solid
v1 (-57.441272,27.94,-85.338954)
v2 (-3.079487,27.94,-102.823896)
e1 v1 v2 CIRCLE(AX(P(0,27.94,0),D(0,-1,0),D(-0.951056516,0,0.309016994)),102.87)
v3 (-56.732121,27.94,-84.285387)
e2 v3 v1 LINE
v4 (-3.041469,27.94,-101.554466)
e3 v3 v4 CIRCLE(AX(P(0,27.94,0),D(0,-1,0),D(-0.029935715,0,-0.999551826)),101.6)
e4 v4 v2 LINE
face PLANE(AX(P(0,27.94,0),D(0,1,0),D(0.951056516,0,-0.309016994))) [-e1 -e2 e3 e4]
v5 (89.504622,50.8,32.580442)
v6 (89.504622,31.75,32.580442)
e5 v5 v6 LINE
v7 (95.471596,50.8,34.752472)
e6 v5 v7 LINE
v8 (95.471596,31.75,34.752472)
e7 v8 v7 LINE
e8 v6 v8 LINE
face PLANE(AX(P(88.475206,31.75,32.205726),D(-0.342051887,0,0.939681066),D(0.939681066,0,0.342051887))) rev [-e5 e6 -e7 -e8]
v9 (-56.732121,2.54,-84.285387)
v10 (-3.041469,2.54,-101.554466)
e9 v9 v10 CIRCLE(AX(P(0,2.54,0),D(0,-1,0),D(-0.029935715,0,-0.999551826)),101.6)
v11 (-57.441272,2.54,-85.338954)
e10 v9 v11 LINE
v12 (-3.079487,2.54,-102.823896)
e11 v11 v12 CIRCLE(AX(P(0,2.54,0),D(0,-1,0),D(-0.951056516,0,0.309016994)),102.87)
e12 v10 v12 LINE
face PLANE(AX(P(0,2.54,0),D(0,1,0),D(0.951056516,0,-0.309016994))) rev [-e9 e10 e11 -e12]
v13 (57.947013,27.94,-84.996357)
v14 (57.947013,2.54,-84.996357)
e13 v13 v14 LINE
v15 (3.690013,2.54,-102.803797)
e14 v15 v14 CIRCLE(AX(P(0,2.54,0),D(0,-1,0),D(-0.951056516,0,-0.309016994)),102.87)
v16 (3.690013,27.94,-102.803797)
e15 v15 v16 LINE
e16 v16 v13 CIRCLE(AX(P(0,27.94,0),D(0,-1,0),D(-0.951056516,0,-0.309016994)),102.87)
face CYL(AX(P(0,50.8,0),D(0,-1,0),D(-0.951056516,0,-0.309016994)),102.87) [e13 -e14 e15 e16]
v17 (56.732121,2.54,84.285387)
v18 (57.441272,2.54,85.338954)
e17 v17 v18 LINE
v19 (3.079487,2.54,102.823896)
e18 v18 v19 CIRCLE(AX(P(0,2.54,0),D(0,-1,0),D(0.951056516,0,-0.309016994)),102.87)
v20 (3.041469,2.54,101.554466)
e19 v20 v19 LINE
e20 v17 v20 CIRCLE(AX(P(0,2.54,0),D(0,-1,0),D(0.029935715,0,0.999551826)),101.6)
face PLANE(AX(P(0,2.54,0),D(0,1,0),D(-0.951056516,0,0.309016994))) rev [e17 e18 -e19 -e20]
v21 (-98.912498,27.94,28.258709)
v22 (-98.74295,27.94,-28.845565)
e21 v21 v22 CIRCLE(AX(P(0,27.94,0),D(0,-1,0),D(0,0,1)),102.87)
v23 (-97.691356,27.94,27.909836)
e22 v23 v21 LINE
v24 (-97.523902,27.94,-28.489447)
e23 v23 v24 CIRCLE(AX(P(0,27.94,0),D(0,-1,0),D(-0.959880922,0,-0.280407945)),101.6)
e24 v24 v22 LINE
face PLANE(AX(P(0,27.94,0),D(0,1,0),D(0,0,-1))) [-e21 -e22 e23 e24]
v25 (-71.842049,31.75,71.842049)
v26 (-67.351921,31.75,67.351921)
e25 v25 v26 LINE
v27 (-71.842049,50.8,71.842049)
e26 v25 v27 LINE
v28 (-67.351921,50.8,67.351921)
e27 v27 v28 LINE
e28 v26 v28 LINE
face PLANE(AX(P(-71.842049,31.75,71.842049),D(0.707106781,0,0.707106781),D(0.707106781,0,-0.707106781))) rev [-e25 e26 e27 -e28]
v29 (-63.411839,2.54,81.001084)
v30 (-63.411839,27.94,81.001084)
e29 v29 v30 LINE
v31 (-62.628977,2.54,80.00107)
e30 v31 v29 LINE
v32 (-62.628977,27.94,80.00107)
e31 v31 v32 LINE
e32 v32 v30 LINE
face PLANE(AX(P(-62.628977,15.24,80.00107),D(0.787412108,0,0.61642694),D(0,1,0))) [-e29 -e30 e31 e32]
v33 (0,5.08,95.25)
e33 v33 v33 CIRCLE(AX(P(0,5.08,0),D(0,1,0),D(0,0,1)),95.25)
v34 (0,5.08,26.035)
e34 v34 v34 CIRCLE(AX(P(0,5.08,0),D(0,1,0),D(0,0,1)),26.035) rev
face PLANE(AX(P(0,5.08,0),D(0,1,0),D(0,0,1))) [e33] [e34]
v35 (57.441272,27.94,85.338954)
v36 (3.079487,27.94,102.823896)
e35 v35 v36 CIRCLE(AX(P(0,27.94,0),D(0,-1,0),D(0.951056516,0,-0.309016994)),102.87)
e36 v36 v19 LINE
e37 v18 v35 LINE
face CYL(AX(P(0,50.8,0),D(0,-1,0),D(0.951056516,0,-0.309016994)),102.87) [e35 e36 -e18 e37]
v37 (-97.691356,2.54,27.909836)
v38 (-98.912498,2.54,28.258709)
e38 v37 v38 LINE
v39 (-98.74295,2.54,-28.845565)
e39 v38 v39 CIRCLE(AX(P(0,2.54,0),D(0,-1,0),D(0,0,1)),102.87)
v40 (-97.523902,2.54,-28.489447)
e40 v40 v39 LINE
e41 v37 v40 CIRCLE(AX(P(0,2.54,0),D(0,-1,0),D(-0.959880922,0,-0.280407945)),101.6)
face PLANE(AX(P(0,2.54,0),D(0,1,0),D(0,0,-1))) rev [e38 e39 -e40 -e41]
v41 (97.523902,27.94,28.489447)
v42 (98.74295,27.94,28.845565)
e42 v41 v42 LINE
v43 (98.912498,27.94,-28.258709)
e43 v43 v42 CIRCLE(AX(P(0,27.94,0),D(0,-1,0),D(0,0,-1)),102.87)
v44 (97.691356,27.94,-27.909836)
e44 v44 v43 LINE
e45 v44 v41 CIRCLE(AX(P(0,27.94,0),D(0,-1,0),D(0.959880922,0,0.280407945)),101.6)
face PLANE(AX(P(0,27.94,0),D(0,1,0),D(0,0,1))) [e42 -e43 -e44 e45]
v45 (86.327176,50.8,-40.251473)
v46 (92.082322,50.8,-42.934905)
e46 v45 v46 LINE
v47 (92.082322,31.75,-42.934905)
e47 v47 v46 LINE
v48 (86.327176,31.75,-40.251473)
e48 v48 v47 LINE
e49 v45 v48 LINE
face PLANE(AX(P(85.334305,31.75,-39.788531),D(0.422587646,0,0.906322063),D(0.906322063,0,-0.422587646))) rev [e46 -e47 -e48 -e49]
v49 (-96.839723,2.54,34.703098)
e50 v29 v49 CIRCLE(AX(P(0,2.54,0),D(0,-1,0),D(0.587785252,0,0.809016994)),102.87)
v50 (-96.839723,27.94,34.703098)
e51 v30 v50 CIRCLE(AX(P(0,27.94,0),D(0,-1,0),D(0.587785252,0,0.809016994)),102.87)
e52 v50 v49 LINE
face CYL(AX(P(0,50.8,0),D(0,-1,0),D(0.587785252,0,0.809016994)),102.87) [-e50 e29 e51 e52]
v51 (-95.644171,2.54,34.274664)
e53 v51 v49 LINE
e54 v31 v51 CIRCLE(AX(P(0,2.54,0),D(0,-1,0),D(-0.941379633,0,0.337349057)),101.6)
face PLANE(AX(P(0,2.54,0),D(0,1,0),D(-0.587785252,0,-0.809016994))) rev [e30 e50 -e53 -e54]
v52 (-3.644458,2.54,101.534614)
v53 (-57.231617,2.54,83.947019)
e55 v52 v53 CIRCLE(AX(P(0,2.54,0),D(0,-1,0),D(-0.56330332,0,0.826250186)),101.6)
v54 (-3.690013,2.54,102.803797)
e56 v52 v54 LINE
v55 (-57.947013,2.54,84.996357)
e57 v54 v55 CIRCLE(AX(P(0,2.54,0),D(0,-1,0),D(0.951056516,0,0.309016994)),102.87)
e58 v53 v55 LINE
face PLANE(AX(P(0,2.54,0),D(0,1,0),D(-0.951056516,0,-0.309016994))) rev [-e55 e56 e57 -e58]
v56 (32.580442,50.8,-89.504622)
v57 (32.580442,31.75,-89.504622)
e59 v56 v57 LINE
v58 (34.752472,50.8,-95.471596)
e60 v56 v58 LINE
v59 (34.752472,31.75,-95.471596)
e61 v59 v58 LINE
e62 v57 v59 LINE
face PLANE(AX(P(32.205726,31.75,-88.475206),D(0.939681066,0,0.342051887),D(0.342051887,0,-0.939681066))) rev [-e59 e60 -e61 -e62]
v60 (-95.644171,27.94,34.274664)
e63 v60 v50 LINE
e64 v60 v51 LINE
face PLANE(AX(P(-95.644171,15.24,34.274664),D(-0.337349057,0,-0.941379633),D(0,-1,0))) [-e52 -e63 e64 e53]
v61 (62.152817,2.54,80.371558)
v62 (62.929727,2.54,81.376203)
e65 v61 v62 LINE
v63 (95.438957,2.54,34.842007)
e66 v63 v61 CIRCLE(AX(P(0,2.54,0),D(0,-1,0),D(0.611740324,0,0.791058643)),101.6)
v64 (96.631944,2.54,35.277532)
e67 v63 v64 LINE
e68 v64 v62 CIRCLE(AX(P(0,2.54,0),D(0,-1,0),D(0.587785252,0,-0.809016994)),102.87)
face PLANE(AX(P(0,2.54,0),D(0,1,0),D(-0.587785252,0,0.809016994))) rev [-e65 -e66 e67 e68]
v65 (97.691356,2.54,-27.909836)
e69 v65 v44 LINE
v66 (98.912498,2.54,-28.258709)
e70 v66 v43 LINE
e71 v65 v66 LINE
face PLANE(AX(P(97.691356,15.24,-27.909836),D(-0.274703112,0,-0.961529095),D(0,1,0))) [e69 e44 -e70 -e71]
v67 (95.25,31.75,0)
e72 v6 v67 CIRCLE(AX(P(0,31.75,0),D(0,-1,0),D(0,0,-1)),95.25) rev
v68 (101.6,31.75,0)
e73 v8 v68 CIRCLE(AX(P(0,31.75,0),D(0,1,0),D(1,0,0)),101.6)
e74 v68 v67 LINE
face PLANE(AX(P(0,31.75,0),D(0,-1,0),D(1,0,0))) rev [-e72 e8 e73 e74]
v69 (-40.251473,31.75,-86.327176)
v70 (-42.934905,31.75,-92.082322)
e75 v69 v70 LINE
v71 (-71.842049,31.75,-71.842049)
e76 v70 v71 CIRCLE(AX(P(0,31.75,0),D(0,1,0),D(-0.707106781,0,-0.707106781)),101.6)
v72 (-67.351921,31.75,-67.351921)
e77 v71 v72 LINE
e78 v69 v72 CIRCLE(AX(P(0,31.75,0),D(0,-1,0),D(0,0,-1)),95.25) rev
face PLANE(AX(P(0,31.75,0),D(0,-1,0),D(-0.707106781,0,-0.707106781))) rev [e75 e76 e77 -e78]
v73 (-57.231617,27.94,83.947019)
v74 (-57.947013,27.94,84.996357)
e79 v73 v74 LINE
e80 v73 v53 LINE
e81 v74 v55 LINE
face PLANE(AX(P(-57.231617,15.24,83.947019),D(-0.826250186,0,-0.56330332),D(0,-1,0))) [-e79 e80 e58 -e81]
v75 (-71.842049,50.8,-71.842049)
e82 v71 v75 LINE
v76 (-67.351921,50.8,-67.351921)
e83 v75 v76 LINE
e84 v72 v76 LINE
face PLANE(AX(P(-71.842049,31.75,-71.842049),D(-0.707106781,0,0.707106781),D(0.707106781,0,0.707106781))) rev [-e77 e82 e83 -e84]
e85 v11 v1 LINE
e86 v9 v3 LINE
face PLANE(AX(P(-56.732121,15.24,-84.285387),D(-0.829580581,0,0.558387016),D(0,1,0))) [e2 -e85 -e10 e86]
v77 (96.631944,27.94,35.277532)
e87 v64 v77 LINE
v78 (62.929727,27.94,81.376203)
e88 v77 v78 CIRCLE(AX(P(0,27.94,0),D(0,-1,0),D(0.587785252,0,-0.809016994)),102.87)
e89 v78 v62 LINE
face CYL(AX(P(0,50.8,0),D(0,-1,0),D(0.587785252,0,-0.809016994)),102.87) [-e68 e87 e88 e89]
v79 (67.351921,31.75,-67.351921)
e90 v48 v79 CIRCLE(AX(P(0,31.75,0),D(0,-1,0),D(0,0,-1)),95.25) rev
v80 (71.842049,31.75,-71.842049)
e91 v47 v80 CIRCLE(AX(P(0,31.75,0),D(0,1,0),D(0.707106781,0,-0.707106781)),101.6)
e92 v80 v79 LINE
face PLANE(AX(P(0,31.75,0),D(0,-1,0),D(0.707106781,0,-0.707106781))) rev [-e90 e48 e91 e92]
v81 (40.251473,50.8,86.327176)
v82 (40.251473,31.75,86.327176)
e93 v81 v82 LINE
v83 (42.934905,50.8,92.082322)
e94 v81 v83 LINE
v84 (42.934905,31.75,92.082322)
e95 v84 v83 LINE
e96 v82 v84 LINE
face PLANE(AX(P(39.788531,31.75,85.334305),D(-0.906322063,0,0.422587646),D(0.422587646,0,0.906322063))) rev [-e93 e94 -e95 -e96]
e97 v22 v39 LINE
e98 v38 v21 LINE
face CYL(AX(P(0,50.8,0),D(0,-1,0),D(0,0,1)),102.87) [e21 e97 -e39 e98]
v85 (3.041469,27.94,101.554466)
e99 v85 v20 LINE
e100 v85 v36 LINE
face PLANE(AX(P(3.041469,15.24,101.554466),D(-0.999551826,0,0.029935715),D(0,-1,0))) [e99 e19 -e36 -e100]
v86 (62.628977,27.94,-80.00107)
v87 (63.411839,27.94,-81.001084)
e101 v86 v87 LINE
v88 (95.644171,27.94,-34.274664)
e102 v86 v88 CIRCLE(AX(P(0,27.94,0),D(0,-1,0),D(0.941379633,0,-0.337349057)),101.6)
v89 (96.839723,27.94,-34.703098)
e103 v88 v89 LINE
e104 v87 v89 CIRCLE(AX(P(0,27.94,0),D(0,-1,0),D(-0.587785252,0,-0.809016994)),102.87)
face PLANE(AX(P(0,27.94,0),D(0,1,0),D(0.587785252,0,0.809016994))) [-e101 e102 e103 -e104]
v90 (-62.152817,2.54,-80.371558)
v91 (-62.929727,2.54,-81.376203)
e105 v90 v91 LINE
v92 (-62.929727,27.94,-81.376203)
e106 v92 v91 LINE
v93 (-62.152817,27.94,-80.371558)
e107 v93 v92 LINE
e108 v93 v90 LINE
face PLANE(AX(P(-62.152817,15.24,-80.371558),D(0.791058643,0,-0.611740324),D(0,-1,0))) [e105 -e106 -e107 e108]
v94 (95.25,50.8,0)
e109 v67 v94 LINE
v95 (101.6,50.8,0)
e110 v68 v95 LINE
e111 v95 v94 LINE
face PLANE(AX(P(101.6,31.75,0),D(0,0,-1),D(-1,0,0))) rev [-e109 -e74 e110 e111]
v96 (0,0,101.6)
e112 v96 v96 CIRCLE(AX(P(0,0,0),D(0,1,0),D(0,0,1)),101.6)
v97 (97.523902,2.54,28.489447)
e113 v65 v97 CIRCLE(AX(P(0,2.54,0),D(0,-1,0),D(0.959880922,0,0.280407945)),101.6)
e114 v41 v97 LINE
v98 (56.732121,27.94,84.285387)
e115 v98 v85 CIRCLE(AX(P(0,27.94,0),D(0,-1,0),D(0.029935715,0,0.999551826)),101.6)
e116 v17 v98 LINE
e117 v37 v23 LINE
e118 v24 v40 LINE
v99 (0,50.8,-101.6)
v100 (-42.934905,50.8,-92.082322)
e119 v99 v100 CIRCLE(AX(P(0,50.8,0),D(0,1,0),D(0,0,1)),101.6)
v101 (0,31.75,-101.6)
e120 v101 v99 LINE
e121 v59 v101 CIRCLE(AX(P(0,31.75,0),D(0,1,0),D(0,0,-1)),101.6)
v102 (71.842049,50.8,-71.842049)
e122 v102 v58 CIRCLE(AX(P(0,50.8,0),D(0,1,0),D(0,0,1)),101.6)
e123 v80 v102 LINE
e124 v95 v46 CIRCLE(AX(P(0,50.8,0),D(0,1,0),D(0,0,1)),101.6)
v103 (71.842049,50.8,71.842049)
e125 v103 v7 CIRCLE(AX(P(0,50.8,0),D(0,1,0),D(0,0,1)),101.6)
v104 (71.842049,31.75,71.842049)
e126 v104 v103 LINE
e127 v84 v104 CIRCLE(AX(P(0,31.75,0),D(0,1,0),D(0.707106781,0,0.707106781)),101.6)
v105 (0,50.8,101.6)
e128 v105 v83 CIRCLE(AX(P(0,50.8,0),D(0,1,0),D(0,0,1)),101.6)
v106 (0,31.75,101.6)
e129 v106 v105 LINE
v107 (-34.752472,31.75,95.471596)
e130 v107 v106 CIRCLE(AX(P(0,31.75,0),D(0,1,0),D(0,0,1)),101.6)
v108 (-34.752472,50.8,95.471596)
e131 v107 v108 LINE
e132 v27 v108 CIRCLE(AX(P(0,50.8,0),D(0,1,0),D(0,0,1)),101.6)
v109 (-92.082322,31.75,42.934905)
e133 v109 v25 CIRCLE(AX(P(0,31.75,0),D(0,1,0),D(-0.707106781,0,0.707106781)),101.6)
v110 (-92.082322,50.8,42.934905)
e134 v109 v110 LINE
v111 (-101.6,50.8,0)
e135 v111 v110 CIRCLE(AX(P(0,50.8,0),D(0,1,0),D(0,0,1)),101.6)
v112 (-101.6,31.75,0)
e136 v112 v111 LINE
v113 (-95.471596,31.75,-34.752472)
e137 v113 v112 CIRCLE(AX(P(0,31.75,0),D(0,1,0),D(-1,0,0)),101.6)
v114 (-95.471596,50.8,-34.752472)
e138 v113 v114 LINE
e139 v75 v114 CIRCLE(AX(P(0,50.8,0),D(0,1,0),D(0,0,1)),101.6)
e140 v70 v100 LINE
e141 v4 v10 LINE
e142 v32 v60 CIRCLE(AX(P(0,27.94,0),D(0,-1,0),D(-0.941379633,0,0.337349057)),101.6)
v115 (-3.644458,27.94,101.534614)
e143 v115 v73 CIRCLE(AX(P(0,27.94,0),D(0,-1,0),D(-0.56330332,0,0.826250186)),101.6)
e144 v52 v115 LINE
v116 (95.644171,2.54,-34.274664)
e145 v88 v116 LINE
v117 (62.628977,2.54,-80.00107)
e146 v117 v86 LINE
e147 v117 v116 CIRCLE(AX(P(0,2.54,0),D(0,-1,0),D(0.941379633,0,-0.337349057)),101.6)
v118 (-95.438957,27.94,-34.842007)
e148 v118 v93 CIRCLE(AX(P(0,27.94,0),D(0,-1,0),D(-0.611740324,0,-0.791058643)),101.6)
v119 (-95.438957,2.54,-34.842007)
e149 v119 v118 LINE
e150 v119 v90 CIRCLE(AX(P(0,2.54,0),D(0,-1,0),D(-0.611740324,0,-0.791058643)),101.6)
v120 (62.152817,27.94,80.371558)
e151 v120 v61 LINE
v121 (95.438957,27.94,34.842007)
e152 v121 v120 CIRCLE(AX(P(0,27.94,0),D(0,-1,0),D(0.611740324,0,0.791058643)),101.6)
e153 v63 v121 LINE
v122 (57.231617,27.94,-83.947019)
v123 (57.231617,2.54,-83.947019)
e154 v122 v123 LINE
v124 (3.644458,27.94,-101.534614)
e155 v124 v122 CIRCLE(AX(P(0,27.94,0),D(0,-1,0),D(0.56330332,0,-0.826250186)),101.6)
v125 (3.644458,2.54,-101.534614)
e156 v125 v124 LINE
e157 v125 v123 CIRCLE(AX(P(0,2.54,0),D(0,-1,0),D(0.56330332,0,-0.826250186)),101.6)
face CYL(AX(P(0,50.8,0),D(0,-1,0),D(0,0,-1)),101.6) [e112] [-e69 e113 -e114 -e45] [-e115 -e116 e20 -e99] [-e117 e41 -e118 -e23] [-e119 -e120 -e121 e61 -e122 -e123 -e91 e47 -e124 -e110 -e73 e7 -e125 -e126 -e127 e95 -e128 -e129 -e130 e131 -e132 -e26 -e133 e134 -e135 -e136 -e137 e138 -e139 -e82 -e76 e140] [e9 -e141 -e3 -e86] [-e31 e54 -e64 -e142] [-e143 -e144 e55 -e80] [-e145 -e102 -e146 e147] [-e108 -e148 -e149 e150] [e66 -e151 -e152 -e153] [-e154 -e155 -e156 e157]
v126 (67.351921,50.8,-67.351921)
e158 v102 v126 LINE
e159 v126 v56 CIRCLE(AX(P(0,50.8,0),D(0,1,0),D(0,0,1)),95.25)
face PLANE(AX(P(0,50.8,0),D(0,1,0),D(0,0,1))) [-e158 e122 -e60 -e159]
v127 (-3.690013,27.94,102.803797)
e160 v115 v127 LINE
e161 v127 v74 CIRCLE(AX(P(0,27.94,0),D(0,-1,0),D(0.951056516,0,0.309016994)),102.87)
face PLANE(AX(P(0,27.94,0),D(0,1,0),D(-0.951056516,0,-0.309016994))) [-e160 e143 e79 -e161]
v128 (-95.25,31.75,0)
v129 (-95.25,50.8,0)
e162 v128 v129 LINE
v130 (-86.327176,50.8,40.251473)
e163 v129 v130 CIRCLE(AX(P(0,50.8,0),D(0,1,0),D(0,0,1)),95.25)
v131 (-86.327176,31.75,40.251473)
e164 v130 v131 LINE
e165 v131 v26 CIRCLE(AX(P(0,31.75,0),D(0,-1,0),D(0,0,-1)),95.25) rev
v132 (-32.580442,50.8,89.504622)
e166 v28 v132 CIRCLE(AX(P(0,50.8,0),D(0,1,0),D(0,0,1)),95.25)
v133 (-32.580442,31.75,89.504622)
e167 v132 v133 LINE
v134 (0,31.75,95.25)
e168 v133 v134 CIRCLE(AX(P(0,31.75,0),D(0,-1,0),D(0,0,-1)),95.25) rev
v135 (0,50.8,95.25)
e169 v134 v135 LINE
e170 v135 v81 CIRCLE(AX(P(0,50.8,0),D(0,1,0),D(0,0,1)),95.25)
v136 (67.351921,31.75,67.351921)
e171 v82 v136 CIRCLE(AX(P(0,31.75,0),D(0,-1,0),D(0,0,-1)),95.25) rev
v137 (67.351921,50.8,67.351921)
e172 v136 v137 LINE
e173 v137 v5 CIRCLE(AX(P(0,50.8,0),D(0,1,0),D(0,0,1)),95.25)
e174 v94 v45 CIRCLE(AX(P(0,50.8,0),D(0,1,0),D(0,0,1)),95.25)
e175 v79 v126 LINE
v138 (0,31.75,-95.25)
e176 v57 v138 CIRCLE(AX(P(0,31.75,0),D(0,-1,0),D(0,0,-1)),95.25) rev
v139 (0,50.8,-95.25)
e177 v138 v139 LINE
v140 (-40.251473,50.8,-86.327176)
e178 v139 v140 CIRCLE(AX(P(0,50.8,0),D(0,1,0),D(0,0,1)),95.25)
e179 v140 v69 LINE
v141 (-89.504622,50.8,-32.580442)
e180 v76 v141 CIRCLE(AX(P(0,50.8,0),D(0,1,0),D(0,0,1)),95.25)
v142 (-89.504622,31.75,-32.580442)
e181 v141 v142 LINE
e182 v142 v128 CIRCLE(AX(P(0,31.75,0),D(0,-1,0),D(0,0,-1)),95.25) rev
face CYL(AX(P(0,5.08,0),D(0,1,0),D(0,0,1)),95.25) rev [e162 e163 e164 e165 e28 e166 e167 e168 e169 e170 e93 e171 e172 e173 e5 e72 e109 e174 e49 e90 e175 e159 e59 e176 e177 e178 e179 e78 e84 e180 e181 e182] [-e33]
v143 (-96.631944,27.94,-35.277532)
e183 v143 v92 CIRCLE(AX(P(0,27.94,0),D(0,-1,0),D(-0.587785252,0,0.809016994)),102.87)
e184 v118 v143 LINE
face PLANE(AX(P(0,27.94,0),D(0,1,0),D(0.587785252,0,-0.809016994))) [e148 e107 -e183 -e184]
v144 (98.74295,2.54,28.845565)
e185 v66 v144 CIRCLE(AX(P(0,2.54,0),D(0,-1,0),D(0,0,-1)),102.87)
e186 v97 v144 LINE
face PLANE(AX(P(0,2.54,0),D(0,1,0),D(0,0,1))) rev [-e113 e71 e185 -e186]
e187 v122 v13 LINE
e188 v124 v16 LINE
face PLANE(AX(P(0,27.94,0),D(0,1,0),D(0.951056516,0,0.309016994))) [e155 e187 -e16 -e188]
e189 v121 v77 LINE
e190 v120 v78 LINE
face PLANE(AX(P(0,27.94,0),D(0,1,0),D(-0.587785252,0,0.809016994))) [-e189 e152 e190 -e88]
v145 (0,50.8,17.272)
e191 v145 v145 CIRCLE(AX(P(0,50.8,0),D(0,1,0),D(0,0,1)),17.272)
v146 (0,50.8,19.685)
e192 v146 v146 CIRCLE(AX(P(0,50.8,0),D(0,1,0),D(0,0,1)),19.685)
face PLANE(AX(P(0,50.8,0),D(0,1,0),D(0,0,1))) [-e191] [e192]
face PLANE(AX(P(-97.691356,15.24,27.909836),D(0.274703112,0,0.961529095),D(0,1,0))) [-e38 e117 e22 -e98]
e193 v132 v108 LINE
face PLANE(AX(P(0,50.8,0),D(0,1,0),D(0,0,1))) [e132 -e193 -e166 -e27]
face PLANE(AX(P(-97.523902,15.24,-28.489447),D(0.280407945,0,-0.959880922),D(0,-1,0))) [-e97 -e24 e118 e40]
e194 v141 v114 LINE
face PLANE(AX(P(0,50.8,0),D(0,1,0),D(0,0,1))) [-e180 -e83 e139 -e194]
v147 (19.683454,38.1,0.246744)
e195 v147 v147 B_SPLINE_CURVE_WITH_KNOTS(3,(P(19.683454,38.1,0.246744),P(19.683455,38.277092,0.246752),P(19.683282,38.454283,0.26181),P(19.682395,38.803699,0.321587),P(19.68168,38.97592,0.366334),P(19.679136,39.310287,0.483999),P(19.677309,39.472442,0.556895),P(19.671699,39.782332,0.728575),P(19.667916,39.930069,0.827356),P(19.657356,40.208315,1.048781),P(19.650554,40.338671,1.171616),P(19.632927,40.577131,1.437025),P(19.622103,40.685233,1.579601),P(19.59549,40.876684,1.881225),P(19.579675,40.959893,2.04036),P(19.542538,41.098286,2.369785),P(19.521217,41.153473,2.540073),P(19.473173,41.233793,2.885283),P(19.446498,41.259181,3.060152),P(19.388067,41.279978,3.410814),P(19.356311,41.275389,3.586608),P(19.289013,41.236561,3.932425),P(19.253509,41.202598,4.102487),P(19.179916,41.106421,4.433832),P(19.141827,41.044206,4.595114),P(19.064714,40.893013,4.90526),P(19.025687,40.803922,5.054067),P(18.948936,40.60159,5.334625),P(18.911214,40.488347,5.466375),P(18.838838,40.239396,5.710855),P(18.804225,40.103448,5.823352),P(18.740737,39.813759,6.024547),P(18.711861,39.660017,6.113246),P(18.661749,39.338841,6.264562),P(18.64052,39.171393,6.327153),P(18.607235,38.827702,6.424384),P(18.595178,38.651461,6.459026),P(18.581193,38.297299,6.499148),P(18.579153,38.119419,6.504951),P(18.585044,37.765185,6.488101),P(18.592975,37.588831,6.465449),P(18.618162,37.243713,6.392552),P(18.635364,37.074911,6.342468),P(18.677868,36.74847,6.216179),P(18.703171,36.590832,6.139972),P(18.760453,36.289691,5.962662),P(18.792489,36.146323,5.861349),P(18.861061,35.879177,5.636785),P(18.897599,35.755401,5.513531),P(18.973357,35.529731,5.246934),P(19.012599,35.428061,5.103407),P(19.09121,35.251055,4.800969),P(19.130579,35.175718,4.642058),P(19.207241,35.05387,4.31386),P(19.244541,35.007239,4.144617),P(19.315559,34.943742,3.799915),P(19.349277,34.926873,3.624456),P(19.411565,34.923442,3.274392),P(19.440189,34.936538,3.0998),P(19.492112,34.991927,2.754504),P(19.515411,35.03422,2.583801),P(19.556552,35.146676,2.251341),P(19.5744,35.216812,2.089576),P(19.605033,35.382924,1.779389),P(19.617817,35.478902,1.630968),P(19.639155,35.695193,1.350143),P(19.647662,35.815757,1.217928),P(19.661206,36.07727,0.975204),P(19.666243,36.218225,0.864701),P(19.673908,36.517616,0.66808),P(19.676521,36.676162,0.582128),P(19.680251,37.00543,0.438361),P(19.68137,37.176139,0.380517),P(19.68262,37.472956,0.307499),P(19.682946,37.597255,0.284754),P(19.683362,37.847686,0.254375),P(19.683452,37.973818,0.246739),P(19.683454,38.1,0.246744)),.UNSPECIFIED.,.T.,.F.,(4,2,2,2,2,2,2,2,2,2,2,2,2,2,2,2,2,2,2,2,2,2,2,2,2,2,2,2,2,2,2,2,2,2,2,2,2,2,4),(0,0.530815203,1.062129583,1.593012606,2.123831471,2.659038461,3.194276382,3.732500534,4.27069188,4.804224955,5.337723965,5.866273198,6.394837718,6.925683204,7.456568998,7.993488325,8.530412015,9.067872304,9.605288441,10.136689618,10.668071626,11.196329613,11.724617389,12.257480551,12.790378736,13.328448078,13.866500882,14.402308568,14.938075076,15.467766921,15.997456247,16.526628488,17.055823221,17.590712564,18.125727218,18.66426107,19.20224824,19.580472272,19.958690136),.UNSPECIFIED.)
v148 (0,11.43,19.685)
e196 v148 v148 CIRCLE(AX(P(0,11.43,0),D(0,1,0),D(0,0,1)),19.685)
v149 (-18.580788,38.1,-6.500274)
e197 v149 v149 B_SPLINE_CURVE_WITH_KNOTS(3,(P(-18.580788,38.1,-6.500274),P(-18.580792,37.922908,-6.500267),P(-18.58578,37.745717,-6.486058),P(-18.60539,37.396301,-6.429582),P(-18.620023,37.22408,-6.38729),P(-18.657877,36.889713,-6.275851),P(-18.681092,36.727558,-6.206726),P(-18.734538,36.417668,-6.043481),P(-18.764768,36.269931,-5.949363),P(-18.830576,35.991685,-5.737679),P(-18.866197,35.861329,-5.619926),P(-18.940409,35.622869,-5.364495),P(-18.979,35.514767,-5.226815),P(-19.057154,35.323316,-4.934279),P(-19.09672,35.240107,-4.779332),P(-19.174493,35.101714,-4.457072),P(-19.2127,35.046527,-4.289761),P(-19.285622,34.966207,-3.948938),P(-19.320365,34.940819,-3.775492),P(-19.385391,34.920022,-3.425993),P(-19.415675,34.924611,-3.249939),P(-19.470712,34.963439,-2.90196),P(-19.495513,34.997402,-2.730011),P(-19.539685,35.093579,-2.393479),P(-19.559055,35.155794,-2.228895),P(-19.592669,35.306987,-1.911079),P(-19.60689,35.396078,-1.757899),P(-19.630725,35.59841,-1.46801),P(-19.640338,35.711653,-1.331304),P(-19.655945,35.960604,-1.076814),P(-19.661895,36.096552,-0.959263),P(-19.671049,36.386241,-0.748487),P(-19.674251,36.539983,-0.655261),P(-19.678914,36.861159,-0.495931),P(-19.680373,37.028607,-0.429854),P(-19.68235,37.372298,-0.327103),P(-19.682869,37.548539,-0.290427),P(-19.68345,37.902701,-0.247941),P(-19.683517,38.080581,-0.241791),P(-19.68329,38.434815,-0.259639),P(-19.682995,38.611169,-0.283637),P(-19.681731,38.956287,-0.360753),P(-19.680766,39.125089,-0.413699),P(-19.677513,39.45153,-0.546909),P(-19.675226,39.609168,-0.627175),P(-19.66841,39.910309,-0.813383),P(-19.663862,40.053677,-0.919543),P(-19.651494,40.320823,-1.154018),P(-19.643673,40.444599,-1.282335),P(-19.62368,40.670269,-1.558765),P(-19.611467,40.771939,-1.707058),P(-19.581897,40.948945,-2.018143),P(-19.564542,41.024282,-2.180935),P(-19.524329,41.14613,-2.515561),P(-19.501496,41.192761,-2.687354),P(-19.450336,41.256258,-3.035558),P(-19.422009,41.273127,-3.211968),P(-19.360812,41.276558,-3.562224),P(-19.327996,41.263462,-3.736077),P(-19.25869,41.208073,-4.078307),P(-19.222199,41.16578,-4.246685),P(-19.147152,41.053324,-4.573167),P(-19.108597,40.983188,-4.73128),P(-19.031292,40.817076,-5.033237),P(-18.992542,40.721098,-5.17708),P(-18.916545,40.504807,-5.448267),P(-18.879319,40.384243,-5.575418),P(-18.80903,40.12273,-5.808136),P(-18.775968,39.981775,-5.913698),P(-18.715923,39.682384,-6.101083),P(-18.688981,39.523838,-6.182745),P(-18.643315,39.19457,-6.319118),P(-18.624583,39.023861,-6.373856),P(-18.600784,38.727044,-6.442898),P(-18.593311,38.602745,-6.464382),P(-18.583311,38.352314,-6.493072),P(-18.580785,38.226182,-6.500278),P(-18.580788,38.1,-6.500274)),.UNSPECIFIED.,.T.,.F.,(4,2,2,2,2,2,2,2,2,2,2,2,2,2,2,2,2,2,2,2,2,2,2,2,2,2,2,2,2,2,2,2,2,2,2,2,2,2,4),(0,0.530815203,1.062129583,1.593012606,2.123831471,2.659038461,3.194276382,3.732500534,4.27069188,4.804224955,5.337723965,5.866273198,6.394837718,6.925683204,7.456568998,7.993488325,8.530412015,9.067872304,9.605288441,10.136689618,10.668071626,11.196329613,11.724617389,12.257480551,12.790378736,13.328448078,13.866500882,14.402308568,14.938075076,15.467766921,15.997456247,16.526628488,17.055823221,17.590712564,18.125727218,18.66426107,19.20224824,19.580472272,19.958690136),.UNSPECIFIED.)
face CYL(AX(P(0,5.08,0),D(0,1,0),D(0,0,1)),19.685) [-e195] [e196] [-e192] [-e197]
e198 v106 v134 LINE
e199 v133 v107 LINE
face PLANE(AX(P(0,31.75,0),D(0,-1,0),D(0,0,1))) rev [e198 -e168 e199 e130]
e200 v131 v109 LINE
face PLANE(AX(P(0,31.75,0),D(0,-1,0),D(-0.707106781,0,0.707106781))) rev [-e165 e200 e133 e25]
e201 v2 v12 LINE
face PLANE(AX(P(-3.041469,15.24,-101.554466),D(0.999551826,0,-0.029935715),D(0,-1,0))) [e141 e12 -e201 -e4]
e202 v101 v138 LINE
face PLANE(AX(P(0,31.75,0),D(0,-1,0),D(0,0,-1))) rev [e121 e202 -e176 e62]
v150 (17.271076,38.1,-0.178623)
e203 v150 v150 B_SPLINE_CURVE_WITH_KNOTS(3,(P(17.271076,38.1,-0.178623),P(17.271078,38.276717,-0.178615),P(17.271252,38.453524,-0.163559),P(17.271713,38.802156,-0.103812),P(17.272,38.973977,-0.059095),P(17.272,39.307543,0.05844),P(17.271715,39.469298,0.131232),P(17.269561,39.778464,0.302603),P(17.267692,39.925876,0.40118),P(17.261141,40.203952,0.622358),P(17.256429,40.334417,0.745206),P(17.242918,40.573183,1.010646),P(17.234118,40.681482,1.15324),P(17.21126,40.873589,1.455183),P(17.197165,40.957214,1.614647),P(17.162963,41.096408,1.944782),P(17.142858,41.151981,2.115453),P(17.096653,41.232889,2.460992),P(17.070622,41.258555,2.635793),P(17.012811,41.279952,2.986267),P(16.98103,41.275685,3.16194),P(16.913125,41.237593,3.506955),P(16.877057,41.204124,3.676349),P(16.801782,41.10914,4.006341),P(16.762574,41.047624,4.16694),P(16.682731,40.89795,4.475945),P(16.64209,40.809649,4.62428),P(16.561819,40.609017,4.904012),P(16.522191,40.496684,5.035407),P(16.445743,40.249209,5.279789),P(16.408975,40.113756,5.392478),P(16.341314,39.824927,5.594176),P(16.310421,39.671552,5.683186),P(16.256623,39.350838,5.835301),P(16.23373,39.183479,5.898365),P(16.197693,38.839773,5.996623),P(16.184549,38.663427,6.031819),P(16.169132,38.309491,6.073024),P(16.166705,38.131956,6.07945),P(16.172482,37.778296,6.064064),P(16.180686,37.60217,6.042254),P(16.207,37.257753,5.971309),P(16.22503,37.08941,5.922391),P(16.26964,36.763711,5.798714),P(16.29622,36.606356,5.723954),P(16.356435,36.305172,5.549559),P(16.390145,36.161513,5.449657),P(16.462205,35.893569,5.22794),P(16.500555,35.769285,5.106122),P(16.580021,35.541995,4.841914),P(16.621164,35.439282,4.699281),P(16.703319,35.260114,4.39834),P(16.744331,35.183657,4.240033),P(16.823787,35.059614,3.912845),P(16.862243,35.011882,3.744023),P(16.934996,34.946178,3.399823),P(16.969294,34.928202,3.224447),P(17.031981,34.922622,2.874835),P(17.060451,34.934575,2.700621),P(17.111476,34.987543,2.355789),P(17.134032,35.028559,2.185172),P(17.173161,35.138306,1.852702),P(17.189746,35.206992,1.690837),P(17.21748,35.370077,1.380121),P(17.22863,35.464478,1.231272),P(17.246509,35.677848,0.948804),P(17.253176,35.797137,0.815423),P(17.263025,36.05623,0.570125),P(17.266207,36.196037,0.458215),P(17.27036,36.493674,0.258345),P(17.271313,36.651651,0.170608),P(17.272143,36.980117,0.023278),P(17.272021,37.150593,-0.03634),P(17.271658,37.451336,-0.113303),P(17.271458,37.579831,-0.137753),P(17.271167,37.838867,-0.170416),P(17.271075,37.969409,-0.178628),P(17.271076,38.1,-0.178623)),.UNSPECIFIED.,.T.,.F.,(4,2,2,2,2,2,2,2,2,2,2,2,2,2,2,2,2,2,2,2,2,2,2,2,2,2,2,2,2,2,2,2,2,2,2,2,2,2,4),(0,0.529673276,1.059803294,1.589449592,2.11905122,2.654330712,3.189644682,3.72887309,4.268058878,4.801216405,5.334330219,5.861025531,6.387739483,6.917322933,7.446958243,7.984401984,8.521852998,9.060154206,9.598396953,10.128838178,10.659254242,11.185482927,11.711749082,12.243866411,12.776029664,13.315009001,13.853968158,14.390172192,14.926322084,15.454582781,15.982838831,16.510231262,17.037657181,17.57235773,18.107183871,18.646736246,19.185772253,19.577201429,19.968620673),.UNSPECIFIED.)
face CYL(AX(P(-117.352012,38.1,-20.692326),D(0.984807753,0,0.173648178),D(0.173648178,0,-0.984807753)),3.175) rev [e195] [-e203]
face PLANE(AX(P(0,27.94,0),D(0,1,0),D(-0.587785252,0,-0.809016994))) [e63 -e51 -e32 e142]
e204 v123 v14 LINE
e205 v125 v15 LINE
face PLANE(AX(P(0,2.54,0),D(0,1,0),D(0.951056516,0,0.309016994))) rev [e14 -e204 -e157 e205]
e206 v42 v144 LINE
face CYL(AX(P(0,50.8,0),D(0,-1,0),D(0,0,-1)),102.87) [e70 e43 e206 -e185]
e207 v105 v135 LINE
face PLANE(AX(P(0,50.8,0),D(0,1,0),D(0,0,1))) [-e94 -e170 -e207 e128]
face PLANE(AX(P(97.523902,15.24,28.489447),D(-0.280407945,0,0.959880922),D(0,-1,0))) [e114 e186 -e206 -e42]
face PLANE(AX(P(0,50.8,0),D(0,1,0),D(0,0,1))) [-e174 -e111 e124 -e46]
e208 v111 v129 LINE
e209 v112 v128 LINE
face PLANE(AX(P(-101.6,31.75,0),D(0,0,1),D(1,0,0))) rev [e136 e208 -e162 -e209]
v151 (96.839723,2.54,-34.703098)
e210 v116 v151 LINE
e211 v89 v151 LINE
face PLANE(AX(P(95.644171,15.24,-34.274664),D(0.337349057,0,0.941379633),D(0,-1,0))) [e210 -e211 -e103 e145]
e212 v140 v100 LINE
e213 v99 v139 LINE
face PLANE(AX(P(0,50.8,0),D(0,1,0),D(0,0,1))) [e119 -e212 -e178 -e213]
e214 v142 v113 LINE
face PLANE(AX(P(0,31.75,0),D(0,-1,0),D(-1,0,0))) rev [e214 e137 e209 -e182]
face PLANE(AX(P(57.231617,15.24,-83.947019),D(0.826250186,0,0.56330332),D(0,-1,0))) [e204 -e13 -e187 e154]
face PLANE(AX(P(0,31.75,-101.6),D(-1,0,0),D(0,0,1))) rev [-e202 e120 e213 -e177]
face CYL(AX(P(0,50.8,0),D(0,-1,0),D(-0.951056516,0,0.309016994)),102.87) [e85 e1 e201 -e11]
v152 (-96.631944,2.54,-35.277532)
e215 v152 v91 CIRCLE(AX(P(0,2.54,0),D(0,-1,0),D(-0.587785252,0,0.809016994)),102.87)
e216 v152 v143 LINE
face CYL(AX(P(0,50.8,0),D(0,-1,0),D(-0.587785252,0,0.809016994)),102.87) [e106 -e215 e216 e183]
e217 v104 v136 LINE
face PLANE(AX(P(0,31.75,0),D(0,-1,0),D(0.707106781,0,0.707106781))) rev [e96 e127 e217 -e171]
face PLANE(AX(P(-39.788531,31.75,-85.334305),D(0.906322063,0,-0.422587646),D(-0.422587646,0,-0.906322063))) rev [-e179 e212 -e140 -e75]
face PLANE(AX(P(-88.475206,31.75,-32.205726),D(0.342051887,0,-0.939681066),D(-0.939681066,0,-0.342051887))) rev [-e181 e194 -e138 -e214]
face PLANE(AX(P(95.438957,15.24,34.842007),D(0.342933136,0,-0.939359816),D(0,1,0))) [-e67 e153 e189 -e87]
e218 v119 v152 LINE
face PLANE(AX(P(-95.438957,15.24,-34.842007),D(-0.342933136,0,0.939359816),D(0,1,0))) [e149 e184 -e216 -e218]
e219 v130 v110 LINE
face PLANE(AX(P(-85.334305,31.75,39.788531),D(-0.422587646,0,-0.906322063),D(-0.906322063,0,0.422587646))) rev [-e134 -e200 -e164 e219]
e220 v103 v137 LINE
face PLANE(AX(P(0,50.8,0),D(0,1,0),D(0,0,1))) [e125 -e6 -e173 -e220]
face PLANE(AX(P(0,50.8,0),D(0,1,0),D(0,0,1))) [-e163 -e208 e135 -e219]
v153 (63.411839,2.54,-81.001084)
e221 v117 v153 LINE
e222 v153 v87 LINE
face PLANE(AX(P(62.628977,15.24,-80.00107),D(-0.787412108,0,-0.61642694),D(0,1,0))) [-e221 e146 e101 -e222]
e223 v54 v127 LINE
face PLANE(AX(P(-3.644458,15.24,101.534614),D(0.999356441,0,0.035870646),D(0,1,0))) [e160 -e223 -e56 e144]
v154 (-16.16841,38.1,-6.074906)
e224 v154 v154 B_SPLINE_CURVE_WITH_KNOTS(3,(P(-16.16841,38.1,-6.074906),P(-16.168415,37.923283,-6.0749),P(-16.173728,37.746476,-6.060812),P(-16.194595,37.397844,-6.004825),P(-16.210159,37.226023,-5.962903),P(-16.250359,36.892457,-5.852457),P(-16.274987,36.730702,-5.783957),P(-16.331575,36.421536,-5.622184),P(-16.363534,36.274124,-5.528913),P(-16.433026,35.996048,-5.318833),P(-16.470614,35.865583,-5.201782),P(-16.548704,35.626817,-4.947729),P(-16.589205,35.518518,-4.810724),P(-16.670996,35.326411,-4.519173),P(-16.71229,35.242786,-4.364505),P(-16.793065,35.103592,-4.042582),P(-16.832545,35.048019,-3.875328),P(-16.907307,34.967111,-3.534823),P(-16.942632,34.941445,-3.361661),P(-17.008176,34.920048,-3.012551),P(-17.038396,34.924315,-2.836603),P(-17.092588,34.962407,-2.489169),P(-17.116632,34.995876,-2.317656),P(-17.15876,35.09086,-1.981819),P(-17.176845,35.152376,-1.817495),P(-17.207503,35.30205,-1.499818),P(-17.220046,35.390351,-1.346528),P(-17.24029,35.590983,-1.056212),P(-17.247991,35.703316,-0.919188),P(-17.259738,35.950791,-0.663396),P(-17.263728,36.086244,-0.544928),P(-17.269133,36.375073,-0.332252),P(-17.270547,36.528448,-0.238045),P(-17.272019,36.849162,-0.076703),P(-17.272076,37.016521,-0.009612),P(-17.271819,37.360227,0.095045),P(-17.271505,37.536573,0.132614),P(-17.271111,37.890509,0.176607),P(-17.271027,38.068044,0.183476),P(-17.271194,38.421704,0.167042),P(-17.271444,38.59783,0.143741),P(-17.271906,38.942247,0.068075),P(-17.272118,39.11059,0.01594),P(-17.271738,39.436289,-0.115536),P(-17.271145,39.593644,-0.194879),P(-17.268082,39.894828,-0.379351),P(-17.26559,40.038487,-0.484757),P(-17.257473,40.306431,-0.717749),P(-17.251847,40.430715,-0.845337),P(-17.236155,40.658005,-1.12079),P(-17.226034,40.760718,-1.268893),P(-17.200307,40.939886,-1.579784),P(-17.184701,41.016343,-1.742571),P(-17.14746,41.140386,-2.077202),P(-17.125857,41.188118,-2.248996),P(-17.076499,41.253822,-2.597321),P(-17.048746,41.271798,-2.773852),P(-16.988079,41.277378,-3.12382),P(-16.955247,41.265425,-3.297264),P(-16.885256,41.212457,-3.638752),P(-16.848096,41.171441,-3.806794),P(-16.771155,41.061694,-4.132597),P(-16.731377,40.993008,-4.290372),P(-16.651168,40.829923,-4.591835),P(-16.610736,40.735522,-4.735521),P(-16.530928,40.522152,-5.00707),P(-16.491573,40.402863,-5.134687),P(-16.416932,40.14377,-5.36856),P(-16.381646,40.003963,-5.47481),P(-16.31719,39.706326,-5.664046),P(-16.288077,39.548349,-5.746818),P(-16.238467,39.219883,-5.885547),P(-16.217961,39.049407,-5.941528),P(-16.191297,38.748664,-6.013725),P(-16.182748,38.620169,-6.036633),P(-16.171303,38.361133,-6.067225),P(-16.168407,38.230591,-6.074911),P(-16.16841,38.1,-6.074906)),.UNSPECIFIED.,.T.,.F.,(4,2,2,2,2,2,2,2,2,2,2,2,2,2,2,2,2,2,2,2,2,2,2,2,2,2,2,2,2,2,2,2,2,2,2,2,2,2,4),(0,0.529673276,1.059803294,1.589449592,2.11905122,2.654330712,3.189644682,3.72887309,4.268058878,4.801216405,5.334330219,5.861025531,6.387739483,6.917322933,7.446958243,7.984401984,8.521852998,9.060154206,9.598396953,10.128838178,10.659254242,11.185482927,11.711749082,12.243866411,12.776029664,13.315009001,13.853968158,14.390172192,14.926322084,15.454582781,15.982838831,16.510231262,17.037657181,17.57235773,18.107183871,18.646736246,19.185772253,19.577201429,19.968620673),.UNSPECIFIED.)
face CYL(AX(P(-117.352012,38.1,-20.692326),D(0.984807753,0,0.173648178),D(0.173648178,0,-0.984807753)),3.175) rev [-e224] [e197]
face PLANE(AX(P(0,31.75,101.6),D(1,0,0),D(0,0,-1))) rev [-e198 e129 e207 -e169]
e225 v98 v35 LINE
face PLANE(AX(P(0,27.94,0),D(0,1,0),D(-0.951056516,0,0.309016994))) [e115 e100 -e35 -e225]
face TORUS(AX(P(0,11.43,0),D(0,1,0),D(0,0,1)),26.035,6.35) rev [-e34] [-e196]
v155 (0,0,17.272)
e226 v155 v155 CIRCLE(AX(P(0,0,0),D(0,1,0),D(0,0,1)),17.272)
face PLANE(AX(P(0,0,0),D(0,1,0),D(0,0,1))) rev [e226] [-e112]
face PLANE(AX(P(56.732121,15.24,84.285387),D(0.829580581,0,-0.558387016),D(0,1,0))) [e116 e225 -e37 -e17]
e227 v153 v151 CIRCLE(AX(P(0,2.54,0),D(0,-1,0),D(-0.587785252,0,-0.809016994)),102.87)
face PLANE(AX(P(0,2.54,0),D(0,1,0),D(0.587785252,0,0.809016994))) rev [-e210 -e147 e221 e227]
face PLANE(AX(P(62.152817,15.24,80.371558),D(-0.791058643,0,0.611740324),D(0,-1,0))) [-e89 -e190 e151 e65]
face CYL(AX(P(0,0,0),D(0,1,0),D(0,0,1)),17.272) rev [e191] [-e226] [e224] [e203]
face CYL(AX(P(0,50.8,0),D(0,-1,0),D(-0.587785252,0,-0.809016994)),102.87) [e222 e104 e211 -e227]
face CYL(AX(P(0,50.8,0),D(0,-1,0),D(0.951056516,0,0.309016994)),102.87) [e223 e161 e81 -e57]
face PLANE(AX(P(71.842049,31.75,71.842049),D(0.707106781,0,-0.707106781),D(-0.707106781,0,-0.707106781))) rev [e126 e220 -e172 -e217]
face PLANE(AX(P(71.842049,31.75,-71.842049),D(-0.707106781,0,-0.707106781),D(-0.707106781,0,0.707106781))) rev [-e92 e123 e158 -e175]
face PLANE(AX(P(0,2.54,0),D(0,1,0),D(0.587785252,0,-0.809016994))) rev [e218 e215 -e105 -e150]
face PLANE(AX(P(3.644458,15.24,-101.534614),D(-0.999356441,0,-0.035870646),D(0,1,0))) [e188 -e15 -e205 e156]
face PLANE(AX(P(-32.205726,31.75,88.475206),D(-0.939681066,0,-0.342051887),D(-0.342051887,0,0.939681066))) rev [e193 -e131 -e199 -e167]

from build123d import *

# Parameters (mm, degrees)
SKETCH2_R           = 101.6
BOSS_EXTRUDE1_DEPTH = 50.8
SKETCH3_R           = 95.25
SKETCH3_R_2         = 19.685
CUT_EXTRUDE1_DEPTH  = 45.72
SKETCH4_R           = 17.272
CUT_EXTRUDE2_DEPTH  = 153.4
CUT_EXTRUDE3_START  = -19.05
CUT_EXTRUDE3_DEPTH  = 19.05
CIRPATTERN1_COUNT   = 8
WRAP1_START         = 2.54
WRAP1_DEPTH         = 25.4
CIRPATTERN2_COUNT   = 10
SKETCH9_R           = 3.175
CUT_EXTRUDE5_DEPTH  = 170.748495522
FILLET1_R           = 6.35


# Read off the part's stored shape, not the designer's step: Wrap1
with BuildPart() as part:
    # Sketch2 → Boss-Extrude1 (new body)
    with BuildSketch(Plane(origin=(0, 0, 0), x_dir=(1, 0, 0), z_dir=(0, 1, 0))):
        with Locations(Location((0, 0, 0), (0, 0, 270))):
            Circle(SKETCH2_R)
    extrude(amount=BOSS_EXTRUDE1_DEPTH)

    # Sketch3 → Cut-Extrude1 (cut)
    with BuildSketch(Plane(origin=(0, 50.8, 0), x_dir=(1, 0, 0), z_dir=(0, 1, 0))):
        with Locations(Location((0, 0, 0), (0, 0, 270))):
            Circle(SKETCH3_R)
        with Locations(Location((0, 0, 0), (0, 0, 270))):
            Circle(SKETCH3_R_2, mode=Mode.SUBTRACT)
    extrude(amount=-CUT_EXTRUDE1_DEPTH, mode=Mode.SUBTRACT)

    # Sketch4 → Cut-Extrude2 (cut, through all)
    with BuildSketch(Plane(origin=(0, 50.8, 0), x_dir=(1, 0, 0), z_dir=(0, 1, 0))):
        with Locations(Location((0, 0, 0), (0, 0, 270))):
            Circle(SKETCH4_R)
    extrude(amount=-CUT_EXTRUDE2_DEPTH, mode=Mode.SUBTRACT)

    # Sketch5 → Cut-Extrude3 (cut)
    with BuildSketch(Plane(origin=(0, 50.8, 0), x_dir=(1, 0, 0), z_dir=(0, 1, 0)).offset(CUT_EXTRUDE3_START)):
        with BuildLine():
            Line((0, 101.6), (0, 94.154505037))
            ThreePointArc((0, 94.154505037), (16.351324372, 92.723810373), (32.205726105, 88.475205707))
            Line((32.205726105, 88.475205707), (34.752471706, 95.471596354))
            ThreePointArc((34.752471706, 95.471596354), (17.644344851, 100.056169699), (0, 101.6))
        make_face()
    cut_extrude3 = extrude(amount=CUT_EXTRUDE3_DEPTH, mode=Mode.SUBTRACT)

    # CirPattern1: Cut-Extrude3 ×8 about axis
    cirpattern1_axis = Axis((0, 0, 0), (0, 1, 0))
    for i in range(1, CIRPATTERN1_COUNT):
        add(cut_extrude3.rotate(cirpattern1_axis, i * 360 / CIRPATTERN1_COUNT), mode=Mode.SUBTRACT)

    # Wrap1 outline → Wrap1 (add)
    with BuildSketch(Plane(origin=(0, 0, 0), x_dir=(1, 0, 0), z_dir=(0, 1, 0)).offset(WRAP1_START)):
        with BuildLine():
            ThreePointArc((98.742950455, -28.845565264), (102.869546579, -0.305428593), (98.912497991, 28.258709119))
            Line((98.912497991, 28.258709119), (97.691356041, 27.909836167))
            ThreePointArc((97.691356041, 27.909836167), (101.599552177, -0.30165787), (97.523901684, -28.489447175))
            Line((97.523901684, -28.489447175), (98.742950455, -28.845565264))
        make_face()
    wrap1 = extrude(amount=WRAP1_DEPTH)

    # CirPattern2: Wrap1 ×10 about axis
    cirpattern2_axis = Axis((0, 0, 0), (0, 1, 0))
    for i in range(1, CIRPATTERN2_COUNT):
        add(wrap1.rotate(cirpattern2_axis, i * 360 / CIRPATTERN2_COUNT))

    # Sketch9 → Cut-Extrude5 (cut, through all)
    with BuildSketch(Plane(origin=(19.385940618, 0, 3.418264377), x_dir=(0, 1, 0), z_dir=(0.9848077530122106, 0, 0.17364817766691706))):
        with Locations(Location((38.1, 0, 0), (0, 0, 270))):
            Circle(SKETCH9_R)
    extrude(amount=-CUT_EXTRUDE5_DEPTH, mode=Mode.SUBTRACT)

    # Fillet1
    fillet1_edges = [part.edges().sort_by_distance(p)[0] for p in [
        (0, 5.08, -19.685),
    ]]
    fillet(fillet1_edges, radius=FILLET1_R)


solid = part.part
